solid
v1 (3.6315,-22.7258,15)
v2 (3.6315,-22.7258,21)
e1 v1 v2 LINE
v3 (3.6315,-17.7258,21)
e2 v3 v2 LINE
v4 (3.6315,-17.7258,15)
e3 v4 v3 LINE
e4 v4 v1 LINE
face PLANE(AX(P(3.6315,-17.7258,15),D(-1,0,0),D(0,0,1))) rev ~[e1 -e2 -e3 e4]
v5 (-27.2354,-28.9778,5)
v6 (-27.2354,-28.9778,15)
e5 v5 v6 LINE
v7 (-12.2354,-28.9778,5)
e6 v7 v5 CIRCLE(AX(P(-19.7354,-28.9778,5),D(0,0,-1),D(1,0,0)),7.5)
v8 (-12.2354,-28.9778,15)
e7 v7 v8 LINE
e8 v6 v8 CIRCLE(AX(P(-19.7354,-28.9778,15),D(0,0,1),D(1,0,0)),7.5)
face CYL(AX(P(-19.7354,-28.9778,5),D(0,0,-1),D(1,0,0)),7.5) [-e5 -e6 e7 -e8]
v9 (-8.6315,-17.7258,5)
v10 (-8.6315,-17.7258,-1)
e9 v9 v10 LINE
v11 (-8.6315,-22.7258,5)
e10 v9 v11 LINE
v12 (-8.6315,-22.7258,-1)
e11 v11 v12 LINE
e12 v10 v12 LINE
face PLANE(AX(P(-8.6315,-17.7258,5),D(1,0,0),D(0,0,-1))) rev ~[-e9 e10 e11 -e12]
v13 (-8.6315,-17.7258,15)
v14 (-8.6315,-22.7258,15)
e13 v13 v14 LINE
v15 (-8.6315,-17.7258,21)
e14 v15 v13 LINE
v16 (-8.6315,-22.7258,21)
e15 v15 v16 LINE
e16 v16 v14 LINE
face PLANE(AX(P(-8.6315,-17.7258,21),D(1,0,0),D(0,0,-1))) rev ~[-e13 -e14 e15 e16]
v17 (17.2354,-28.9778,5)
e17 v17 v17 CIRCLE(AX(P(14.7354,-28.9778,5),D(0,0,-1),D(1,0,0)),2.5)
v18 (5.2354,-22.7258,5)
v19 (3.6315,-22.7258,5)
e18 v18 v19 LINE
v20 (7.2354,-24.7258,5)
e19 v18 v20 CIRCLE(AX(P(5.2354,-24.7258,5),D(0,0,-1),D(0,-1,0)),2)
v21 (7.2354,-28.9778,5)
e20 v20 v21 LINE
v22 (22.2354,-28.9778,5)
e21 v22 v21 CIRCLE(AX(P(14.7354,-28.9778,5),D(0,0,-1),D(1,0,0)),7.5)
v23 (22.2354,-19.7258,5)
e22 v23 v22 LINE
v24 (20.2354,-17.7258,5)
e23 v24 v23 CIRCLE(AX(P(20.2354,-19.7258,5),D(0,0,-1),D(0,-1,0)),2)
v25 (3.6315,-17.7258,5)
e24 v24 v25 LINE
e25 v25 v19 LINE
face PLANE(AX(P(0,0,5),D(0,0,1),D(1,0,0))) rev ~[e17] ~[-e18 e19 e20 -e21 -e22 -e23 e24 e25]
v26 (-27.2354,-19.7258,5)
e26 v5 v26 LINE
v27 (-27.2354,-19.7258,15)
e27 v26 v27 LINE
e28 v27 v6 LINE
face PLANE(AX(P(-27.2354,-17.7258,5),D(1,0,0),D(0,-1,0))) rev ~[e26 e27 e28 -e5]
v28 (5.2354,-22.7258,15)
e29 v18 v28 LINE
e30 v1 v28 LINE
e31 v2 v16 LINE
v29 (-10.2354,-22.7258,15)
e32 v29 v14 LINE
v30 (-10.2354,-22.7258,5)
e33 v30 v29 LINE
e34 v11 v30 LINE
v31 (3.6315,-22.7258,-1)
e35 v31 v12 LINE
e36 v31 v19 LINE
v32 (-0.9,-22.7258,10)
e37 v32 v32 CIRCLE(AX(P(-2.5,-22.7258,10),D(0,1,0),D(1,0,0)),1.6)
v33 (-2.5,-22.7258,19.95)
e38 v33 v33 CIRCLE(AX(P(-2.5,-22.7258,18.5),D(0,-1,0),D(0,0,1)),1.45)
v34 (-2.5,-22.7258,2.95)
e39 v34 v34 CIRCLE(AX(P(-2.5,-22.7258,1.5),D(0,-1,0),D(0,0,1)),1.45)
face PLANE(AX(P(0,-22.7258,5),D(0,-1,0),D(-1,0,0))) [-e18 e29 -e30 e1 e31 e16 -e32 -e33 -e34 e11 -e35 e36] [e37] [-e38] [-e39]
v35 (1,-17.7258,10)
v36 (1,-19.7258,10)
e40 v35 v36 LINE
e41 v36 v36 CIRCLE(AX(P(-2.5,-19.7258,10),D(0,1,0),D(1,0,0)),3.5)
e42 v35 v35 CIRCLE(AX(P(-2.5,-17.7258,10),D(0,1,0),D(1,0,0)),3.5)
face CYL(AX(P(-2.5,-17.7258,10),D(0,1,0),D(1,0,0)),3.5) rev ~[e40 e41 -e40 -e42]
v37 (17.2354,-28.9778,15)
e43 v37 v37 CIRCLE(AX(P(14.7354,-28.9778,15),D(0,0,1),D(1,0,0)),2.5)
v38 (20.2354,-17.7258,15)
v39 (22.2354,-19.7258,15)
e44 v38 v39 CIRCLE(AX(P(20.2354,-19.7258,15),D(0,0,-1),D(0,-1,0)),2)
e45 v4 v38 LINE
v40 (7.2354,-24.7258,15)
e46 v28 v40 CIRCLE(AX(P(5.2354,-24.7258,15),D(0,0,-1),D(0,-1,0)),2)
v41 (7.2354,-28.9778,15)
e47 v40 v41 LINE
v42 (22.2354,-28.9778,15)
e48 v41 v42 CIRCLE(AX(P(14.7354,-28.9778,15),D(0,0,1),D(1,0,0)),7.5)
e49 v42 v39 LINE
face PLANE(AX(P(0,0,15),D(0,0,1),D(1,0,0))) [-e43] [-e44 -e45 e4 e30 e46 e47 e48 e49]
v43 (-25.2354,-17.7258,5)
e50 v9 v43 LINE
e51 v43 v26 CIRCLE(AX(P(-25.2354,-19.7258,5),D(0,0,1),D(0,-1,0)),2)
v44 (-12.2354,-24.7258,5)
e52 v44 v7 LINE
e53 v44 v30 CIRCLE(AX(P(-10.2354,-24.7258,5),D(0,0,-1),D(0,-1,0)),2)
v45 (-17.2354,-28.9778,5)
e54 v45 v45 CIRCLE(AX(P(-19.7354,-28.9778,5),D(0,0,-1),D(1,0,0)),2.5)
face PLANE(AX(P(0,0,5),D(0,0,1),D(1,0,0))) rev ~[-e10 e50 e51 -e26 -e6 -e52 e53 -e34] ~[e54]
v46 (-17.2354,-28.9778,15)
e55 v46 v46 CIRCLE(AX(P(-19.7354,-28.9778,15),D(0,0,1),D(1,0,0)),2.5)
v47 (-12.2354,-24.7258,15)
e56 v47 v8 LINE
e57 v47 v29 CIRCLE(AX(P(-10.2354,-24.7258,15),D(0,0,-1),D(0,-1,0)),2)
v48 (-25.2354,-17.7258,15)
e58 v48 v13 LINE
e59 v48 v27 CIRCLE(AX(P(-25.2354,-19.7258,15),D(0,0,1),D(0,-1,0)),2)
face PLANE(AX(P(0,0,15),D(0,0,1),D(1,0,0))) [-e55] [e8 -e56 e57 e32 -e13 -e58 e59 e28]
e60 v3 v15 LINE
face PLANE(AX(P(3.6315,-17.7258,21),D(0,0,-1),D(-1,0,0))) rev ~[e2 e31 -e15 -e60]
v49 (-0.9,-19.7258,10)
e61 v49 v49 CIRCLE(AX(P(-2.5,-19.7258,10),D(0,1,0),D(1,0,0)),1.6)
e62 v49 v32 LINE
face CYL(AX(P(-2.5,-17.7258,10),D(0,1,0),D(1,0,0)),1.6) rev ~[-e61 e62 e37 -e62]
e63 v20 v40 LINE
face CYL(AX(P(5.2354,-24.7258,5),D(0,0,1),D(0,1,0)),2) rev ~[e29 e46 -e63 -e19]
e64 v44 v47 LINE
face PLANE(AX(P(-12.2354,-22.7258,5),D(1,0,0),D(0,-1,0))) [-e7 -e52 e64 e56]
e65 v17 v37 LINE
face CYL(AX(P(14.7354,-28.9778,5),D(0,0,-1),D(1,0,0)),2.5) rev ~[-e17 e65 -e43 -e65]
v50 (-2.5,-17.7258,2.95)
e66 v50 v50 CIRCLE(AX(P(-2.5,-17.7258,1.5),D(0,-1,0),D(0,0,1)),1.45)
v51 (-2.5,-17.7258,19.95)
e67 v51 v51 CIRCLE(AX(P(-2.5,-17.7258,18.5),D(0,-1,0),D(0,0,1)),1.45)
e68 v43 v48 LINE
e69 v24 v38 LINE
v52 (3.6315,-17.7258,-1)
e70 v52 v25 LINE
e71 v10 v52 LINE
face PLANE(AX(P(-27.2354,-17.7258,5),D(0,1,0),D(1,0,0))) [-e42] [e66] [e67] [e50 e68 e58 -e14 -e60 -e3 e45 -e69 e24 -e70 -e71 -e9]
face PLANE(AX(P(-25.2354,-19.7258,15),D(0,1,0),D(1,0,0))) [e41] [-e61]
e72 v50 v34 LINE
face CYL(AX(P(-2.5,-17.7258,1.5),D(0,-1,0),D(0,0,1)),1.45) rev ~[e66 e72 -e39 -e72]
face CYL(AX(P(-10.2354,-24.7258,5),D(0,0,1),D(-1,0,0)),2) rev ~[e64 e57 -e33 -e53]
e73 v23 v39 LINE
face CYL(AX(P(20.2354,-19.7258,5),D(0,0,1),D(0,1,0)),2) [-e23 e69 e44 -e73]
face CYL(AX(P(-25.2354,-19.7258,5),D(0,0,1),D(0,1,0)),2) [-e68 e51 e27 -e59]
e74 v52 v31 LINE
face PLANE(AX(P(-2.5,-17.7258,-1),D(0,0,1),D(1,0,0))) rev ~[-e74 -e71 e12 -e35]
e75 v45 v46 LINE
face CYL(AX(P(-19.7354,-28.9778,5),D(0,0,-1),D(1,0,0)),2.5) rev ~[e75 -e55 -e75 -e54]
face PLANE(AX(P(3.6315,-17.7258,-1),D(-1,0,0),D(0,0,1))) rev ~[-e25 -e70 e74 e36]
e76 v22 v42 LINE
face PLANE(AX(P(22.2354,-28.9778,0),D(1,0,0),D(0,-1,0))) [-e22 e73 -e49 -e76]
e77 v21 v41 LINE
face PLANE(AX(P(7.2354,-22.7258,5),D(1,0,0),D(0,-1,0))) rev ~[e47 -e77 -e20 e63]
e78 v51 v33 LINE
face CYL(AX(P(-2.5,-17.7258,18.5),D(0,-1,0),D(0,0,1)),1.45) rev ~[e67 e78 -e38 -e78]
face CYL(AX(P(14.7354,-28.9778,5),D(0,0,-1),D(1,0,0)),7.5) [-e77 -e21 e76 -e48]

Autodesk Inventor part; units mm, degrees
ref_plane "YZ Plane" through (0, 0, 0) normal (1, 0, 0) x (0, 1, 0)
ref_plane "XZ Plane" through (0, 0, 0) normal (0, 1, 0) x (-1, 0, 0)
ref_plane "XY Plane" through (0, 0, 0) normal (0, 0, 1) x (1, 0, 0)
sketch "Szkic1" plane through (0, 0, 0) normal (0, 0, 1) x (1, 0, 0)
  line L0 (-2.5, 0) -> (-27.5, 0)
  line L1 (-27.5, 0) -> (-19.7354, -28.9778)
  line L2 (-27.5, 0) -> (2.5, 0) construction
  line L3 (-27.5, 0) -> (-37.3351, 36.7052)
  line L4 (-27.5, 0) -> (10.5, 0) construction
  line L5 (-37.3351, 36.7052) -> (-37.3351, 54.7052)
  line L6 (-37.3351, 54.7052) -> (-2.5, 54.7052)
  line L7 (-37.3351, 54.7052) -> (-27.3351, 72.0257)
  line L8 (-37.3351, 54.7052) -> (-17.3351, 54.7052) construction
  line L9 (-37.3351, 54.7052) -> (-27.3351, 37.3847)
  line L10 (-37.3351, 54.7052) -> (-17.3351, 54.7052) construction
  circle A0 centre (-27.5, 0) radius 1.5
  line L11 (-2.5, 0) -> (-2.5, -12)
  line L12 (-2.5, -12) -> (-27.5, -12)
  line L13 (-27.5, -12) -> (-19.7354, -28.9778)
  line L14 (-27.5, -12) -> (-48.0171, 32.862)
  line L15 (-48.0171, 32.862) -> (-51.0127, 50.611)
  line L16 (-48.0171, 32.862) -> (-30.0171, 32.862) construction
  line L17 (-51.0127, 50.611) -> (-38.2696, 35.1962)
  line L18 (-51.0127, 50.611) -> (-31.0127, 50.611) construction
  line L19 (-51.0127, 50.611) -> (-44.0347, 69.3542)
  line L20 (-51.0127, 50.611) -> (-31.0127, 50.611) construction
  circle A1 centre (-27.5, -12) radius 1.5
  line L21 (-19.7354, -28.9778) -> (0, -28.9778)
  circle A2 centre (-19.7354, -28.9778) radius 2.5
  line L22 (-22.2354, -28.9778) -> (-27.2354, -28.9778)
  line L23 (17.2354, -28.9778) -> (22.2354, -28.9778)
  circle A3 centre (14.7354, -28.9778) radius 2.5
  line L24 (22.5, -12) -> (14.7354, -28.9778)
  line L25 (14.7354, -28.9778) -> (0, -28.9778)
  line L26 (-2.5, -12) -> (22.5, -12)
  line L27 (32.3351, 54.7052) -> (22.3351, 37.3847)
  line L28 (32.3351, 36.7052) -> (32.3351, 54.7052)
  line L29 (46.0127, 50.611) -> (33.2696, 35.1962)
  line L30 (43.0171, 32.862) -> (46.0127, 50.611)
  line L31 (43.0171, 32.862) -> (25.0171, 32.862) construction
  circle A4 centre (22.5, 0) radius 1.5
  line L32 (22.5, 0) -> (32.3351, 36.7052)
  circle A5 centre (22.5, -12) radius 1.5
  line L33 (22.5, -12) -> (43.0171, 32.862)
  line L34 (-2.5, 0) -> (22.5, 0)
  line L35 (22.5, 0) -> (14.7354, -28.9778)
  line L36 (22.5, 0) -> (-7.5, 0) construction
  line L37 (22.5, 0) -> (-15.5, 0) construction
  line L38 (46.0127, 50.611) -> (26.0127, 50.611) construction
  line L39 (46.0127, 50.611) -> (26.0127, 50.611) construction
  line L40 (32.3351, 54.7052) -> (12.3351, 54.7052) construction
  line L41 (32.3351, 54.7052) -> (12.3351, 54.7052) construction
  line L42 (32.3351, 54.7052) -> (-2.5, 54.7052)
  line L43 (46.0127, 50.611) -> (39.0347, 69.3542)
  line L44 (32.3351, 54.7052) -> (22.3351, 72.0257)
  line L45 (-19.7354, -31.4778) -> (-19.7354, -36.4778)
  line L46 (-19.7354, -36.4778) -> (0, -36.4778)
  line L47 (-19.7354, -36.4778) -> (-22.2354, -36.4778)
  line L48 (-27.2354, -28.9778) -> (-27.2354, -31.4778)
  line L49 (-19.7354, -26.4778) -> (-19.7354, -21.4778)
  line L50 (-19.7354, -21.4778) -> (-22.2354, -21.4778)
  line L51 (-27.2354, -26.4778) -> (-27.2354, -28.9778)
  line L52 (-19.7354, -21.4778) -> (0, -21.4778)
  line L53 (22.5, 0) -> (14.7354, -28.9778)
  line L54 (22.5, -12) -> (14.7354, -28.9778)
  line L55 (14.7354, -28.9778) -> (-5, -28.9778)
  circle A6 centre (14.7354, -28.9778) radius 2.5
  line L56 (17.2354, -28.9778) -> (22.2354, -28.9778)
  line L57 (-19.7354, -28.9778) -> (-5, -28.9778)
  line L58 (14.7354, -31.4778) -> (14.7354, -36.4778)
  line L59 (14.7354, -36.4778) -> (-5, -36.4778)
  line L60 (14.7354, -36.4778) -> (17.2354, -36.4778)
  line L61 (22.2354, -28.9778) -> (22.2354, -31.4778)
  line L62 (14.7354, -26.4778) -> (14.7354, -21.4778)
  line L63 (14.7354, -21.4778) -> (17.2354, -21.4778)
  line L64 (22.2354, -26.4778) -> (22.2354, -28.9778)
  line L65 (14.7354, -21.4778) -> (-5, -21.4778)
  arc A7 (-22.2354, -21.4778) -> (-27.2354, -26.4778) centre (-22.2354, -26.4778) ccw
  arc A8 (-27.2354, -31.4778) -> (-22.2354, -36.4778) centre (-22.2354, -31.4778) ccw
  arc A9 (22.2354, -26.4778) -> (17.2354, -21.4778) centre (17.2354, -26.4778) ccw
  arc A10 (17.2354, -36.4778) -> (22.2354, -31.4778) centre (17.2354, -31.4778) ccw
  point P0 (0, 0)
  point P1 (-27.2354, -36.4778)
  point P2 (-27.2354, -21.4778)
  point P3 (22.2354, -36.4778)
  point P4 (22.2354, -21.4778)
  dimension "d0" = 25
  dimension "d1" = 30
  dimension "d2" = 75
  dimension "d3" = 38
  dimension "d4" = 105
  dimension "d5" = 18
  dimension "d6" = 20
  dimension "d7" = 60
  dimension "d8" = 20
  dimension "d9" = 60
  dimension "d10" = 3
  dimension "d11" = 12
  dimension "d12" = 25
  dimension "d13" = 49.331
  dimension "d14" = 18
  dimension "d15" = 99.58
  dimension "d16" = 20
  dimension "d17" = 50.42
  dimension "d18" = 20
  dimension "d19" = 69.58
  dimension "d20" = 3
  dimension "d22" = 5
  dimension "d23" = 5
  dimension "d28" = 5
  dimension "d29" = 5
  dimension "d30" = 5
  dimension "d31" = 5
  dimension "d32" = 5
  dimension "d33" = 5
extrude "Wyciągnięcie proste1" add sketch "Szkic1" along normal mid plane 10 contours L50 L49 A2 L1 | L1 A2 L13 A7 L50 | L63 A9 L24 A3 L35 | L35 A3 L62 L63 | L52 L65 L62 A3 L25 L21 A2 L49 | A2 L22 L51 A7 L13 | A9 L64 L23 A3 L24 | L21 L25 A3 L58 L59 L46 L45 A2 | A2 L45 L47 A8 L48 L22 | L23 L61 A10 L60 L58 A3
sketch "Szkic2" plane through (0, 0, 5) normal (0, 0, 1) x (1, 0, 0)
  circle A0 centre (-19.7354, -28.9778) radius 2.5 projected
  circle A1 centre (-19.7354, -28.9778) radius 2.5
  circle A2 centre (14.7354, -28.9778) radius 2.5 projected
  circle A3 centre (14.7354, -28.9778) radius 2.5
  point P0 (0, 0)
extrude "Wyciągnięcie proste2" add sketch "Szkic2" along normal blind 10 and the other way blind 20
sketch "Szkic3" plane through (-22.2354, -36.4778, 5) normal (0, -1, 0) x (1, 0, 0)
  line L0 (44.4709, -10) -> (44.4709, 0) projected
  line L1 (44.4709, -5) -> (-5, -5)
  line L2 (-5, -10) -> (-5, 0) projected
  line L3 (0, 0) -> (39.4709, 0) projected
  line L4 (19.7354, 0) -> (19.7354, -10)
  circle A0 centre (19.7354, -5) radius 1.6
  point P0 (22.2354, -5)
  dimension "d40" = 3.2
extrude "Wyciągnięcie proste3" cut sketch "Szkic3" against normal through all
sketch "Szkic4" plane through (14.7354, -28.9778, 15) normal (0, 0, 1) x (1, 0, 0)
  circle A0 centre (0, 0) radius 2.5
  circle A1 centre (-34.4709, 0) radius 2.5 projected
  circle A2 centre (-34.4709, 0) radius 2.5
  point P0 (-14.7354, 28.9778)
extrude "Wyciągnięcie proste4" cut sketch "Szkic4" against normal through all
sketch "Szkic5" plane through (0, 0, 5) normal (0, 0, 1) x (1, 0, 0)
  line L0 (-22.2354, -21.4778) -> (17.2354, -21.4778) projected
  line L1 (0, -21.4778) -> (0, -22.7258)
  line L2 (0, -21.4778) -> (1.248, -21.4778) construction
  circle A0 centre (14.7354, -28.9778) radius 2.5 projected
  circle A1 centre (14.7354, -28.9778) radius 7.5
  circle A2 centre (-19.7354, -28.9778) radius 2.5 projected
  circle A3 centre (-19.7354, -28.9778) radius 7.5
  line L3 (0, -22.7258) -> (7.2354, -22.7258)
  line L4 (7.2354, -22.7258) -> (7.2354, -28.9778)
  line L5 (0, -22.7258) -> (-12.2354, -22.7258)
  line L6 (-12.2354, -22.7258) -> (-12.2354, -28.9778)
  line L7 (22.2354, -28.9778) -> (22.2354, -21.4778)
  line L8 (22.2354, -26.4778) -> (22.2354, -31.4778) projected
  line L9 (7.2354, -22.7258) -> (7.2354, -12.7258)
  line L10 (7.2354, -12.7258) -> (-12.2354, -12.7258)
  line L11 (-12.2354, -12.7258) -> (-27.2354, -12.7258)
  line L12 (-27.2354, -12.7258) -> (-27.2354, -28.9778)
  line L13 (22.2354, -21.4778) -> (22.2354, -12.7258)
  line L14 (22.2354, -12.7258) -> (7.2354, -12.7258)
  line L15 (-27.2354, -12.7258) -> (-27.2354, -17.7258)
  line L16 (-27.2354, -12.7258) -> (-27.2354, -17.7258)
  line L17 (-27.2354, -17.7258) -> (22.2354, -17.7258)
  point P0 (0, 0)
  dimension "d45" = 1.248
  dimension "d46" = 270
  dimension "d47" = 7.5
  dimension "d48" = 10
extrude "Wyciągnięcie proste5" add sketch "Szkic5" along normal blind 10 contours A3 L12 L17 L9 L0 | L0 L1 L5 L6 A3 | A3 | L0 L9 L3 L1 | L9 L17 L13 L7 A1 L0 | L0 A1 L4 L9 | A1
sketch "Szkic6" plane through (0, 0, -5) normal (0, 0, -1) x (-1, 0, 0)
  line L0 (22.2354, -21.4778) -> (-17.2354, -21.4778) projected
  arc A0 (-17.2354, -21.4778) -> (-22.2354, -26.4778) centre (-17.2354, -26.4778) ccw projected
  line L1 (-22.2354, -26.4778) -> (-22.2354, -31.4778) projected
  arc A1 (-22.2354, -31.4778) -> (-17.2354, -36.4778) centre (-17.2354, -31.4778) ccw projected
  line L2 (-17.2354, -36.4778) -> (22.2354, -36.4778) projected
  arc A2 (22.2354, -36.4778) -> (27.2354, -31.4778) centre (22.2354, -31.4778) ccw projected
  line L3 (27.2354, -31.4778) -> (27.2354, -26.4778) projected
  arc A3 (27.2354, -26.4778) -> (22.2354, -21.4778) centre (22.2354, -26.4778) ccw projected
  point P0 (0, 0)
extrude "Wyciągnięcie proste6" cut sketch "Szkic6" against normal blind 10
fillet "Zaokrąglenie1" radius 2 4 edges at (-12.2354, -22.7258, 10) (7.2354, -22.7258, 10) (22.2354, -17.7258, 10) (-27.2354, -17.7258, 10)
sketch "Szkic7" plane through (-25.2354, -17.7258, 5) normal (0, 1, 0) x (1, 0, 0)
  line L0 (15, -10) -> (30.4709, -10) projected
  line L1 (22.7354, -10) -> (28.8669, -10)
  line L2 (28.8669, -10) -> (28.8669, -16)
  line L3 (28.8669, -16) -> (16.6039, -16)
  line L4 (16.6039, -16) -> (16.6039, -10)
  line L5 (22.7354, -10) -> (16.6039, -10)
  line L6 (16.6039, -10) -> (16.6039, 0)
  line L7 (22.7354, 6) -> (28.8669, 6)
  line L8 (28.8669, 6) -> (28.8669, 0)
  line L9 (28.8669, 0) -> (16.6039, 0)
  line L10 (16.6039, 0) -> (16.6039, 6)
  line L11 (22.7354, 6) -> (16.6039, 6)
  point P0 (25.2354, 5)
  dimension "d54" = 6.1315
  dimension "d55" = 6
  dimension "d56" = 12.263
  dimension "d57" = 10
  dimension "d58" = 6.1315
  dimension "d59" = 6
  dimension "d60" = 12.263
extrude "Wyciągnięcie proste7" add sketch "Szkic7" against normal up to surface (5 mm away)
sketch "Szkic8" plane through (-25.2354, -17.7258, 15) normal (0, 1, 0) x (1, 0, 0)
  line L0 (28.8669, 16) -> (16.6039, 16) projected
  line L1 (22.7354, 16) -> (22.7354, -6)
  line L2 (16.6039, -6) -> (28.8669, -6) projected
  circle A0 centre (22.7354, 5) radius 1.6
  point P0 (25.2354, 15)
  dimension "d64" = 3.2
extrude "Wyciągnięcie proste8" cut sketch "Szkic8" against normal blind 10
sketch "Szkic9" plane through (-25.2354, -17.7258, 15) normal (0, 1, 0) x (1, 0, 0)
  point P0 (22.7354, 13.5)
hole "Otwór1" at (-2.5, -17.7258, 1.5) direction (0, -1, 0) diameter 2.9 end through all
sketch "Szkic10" plane through (-25.2354, -17.7258, 15) normal (0, 1, 0) x (1, 0, 0)
  point P0 (22.7354, -3.5)
hole "Otwór2" at (-2.5, -17.7258, 18.5) direction (0, -1, 0) diameter 2.9 end through all
sketch "Szkic11" plane through (-25.2354, -17.7258, 15) normal (0, 1, 0) x (1, 0, 0)
  circle A0 centre (22.7354, 5) radius 1.6 projected
  circle A1 centre (22.7354, 5) radius 3.5
  point P0 (25.2354, 15)
  dimension "d81" = 7
extrude "Wyciągnięcie proste9" cut sketch "Szkic11" against normal blind 2
properties part number "Podstawa chwytaka" material "Stal, węglowa"
